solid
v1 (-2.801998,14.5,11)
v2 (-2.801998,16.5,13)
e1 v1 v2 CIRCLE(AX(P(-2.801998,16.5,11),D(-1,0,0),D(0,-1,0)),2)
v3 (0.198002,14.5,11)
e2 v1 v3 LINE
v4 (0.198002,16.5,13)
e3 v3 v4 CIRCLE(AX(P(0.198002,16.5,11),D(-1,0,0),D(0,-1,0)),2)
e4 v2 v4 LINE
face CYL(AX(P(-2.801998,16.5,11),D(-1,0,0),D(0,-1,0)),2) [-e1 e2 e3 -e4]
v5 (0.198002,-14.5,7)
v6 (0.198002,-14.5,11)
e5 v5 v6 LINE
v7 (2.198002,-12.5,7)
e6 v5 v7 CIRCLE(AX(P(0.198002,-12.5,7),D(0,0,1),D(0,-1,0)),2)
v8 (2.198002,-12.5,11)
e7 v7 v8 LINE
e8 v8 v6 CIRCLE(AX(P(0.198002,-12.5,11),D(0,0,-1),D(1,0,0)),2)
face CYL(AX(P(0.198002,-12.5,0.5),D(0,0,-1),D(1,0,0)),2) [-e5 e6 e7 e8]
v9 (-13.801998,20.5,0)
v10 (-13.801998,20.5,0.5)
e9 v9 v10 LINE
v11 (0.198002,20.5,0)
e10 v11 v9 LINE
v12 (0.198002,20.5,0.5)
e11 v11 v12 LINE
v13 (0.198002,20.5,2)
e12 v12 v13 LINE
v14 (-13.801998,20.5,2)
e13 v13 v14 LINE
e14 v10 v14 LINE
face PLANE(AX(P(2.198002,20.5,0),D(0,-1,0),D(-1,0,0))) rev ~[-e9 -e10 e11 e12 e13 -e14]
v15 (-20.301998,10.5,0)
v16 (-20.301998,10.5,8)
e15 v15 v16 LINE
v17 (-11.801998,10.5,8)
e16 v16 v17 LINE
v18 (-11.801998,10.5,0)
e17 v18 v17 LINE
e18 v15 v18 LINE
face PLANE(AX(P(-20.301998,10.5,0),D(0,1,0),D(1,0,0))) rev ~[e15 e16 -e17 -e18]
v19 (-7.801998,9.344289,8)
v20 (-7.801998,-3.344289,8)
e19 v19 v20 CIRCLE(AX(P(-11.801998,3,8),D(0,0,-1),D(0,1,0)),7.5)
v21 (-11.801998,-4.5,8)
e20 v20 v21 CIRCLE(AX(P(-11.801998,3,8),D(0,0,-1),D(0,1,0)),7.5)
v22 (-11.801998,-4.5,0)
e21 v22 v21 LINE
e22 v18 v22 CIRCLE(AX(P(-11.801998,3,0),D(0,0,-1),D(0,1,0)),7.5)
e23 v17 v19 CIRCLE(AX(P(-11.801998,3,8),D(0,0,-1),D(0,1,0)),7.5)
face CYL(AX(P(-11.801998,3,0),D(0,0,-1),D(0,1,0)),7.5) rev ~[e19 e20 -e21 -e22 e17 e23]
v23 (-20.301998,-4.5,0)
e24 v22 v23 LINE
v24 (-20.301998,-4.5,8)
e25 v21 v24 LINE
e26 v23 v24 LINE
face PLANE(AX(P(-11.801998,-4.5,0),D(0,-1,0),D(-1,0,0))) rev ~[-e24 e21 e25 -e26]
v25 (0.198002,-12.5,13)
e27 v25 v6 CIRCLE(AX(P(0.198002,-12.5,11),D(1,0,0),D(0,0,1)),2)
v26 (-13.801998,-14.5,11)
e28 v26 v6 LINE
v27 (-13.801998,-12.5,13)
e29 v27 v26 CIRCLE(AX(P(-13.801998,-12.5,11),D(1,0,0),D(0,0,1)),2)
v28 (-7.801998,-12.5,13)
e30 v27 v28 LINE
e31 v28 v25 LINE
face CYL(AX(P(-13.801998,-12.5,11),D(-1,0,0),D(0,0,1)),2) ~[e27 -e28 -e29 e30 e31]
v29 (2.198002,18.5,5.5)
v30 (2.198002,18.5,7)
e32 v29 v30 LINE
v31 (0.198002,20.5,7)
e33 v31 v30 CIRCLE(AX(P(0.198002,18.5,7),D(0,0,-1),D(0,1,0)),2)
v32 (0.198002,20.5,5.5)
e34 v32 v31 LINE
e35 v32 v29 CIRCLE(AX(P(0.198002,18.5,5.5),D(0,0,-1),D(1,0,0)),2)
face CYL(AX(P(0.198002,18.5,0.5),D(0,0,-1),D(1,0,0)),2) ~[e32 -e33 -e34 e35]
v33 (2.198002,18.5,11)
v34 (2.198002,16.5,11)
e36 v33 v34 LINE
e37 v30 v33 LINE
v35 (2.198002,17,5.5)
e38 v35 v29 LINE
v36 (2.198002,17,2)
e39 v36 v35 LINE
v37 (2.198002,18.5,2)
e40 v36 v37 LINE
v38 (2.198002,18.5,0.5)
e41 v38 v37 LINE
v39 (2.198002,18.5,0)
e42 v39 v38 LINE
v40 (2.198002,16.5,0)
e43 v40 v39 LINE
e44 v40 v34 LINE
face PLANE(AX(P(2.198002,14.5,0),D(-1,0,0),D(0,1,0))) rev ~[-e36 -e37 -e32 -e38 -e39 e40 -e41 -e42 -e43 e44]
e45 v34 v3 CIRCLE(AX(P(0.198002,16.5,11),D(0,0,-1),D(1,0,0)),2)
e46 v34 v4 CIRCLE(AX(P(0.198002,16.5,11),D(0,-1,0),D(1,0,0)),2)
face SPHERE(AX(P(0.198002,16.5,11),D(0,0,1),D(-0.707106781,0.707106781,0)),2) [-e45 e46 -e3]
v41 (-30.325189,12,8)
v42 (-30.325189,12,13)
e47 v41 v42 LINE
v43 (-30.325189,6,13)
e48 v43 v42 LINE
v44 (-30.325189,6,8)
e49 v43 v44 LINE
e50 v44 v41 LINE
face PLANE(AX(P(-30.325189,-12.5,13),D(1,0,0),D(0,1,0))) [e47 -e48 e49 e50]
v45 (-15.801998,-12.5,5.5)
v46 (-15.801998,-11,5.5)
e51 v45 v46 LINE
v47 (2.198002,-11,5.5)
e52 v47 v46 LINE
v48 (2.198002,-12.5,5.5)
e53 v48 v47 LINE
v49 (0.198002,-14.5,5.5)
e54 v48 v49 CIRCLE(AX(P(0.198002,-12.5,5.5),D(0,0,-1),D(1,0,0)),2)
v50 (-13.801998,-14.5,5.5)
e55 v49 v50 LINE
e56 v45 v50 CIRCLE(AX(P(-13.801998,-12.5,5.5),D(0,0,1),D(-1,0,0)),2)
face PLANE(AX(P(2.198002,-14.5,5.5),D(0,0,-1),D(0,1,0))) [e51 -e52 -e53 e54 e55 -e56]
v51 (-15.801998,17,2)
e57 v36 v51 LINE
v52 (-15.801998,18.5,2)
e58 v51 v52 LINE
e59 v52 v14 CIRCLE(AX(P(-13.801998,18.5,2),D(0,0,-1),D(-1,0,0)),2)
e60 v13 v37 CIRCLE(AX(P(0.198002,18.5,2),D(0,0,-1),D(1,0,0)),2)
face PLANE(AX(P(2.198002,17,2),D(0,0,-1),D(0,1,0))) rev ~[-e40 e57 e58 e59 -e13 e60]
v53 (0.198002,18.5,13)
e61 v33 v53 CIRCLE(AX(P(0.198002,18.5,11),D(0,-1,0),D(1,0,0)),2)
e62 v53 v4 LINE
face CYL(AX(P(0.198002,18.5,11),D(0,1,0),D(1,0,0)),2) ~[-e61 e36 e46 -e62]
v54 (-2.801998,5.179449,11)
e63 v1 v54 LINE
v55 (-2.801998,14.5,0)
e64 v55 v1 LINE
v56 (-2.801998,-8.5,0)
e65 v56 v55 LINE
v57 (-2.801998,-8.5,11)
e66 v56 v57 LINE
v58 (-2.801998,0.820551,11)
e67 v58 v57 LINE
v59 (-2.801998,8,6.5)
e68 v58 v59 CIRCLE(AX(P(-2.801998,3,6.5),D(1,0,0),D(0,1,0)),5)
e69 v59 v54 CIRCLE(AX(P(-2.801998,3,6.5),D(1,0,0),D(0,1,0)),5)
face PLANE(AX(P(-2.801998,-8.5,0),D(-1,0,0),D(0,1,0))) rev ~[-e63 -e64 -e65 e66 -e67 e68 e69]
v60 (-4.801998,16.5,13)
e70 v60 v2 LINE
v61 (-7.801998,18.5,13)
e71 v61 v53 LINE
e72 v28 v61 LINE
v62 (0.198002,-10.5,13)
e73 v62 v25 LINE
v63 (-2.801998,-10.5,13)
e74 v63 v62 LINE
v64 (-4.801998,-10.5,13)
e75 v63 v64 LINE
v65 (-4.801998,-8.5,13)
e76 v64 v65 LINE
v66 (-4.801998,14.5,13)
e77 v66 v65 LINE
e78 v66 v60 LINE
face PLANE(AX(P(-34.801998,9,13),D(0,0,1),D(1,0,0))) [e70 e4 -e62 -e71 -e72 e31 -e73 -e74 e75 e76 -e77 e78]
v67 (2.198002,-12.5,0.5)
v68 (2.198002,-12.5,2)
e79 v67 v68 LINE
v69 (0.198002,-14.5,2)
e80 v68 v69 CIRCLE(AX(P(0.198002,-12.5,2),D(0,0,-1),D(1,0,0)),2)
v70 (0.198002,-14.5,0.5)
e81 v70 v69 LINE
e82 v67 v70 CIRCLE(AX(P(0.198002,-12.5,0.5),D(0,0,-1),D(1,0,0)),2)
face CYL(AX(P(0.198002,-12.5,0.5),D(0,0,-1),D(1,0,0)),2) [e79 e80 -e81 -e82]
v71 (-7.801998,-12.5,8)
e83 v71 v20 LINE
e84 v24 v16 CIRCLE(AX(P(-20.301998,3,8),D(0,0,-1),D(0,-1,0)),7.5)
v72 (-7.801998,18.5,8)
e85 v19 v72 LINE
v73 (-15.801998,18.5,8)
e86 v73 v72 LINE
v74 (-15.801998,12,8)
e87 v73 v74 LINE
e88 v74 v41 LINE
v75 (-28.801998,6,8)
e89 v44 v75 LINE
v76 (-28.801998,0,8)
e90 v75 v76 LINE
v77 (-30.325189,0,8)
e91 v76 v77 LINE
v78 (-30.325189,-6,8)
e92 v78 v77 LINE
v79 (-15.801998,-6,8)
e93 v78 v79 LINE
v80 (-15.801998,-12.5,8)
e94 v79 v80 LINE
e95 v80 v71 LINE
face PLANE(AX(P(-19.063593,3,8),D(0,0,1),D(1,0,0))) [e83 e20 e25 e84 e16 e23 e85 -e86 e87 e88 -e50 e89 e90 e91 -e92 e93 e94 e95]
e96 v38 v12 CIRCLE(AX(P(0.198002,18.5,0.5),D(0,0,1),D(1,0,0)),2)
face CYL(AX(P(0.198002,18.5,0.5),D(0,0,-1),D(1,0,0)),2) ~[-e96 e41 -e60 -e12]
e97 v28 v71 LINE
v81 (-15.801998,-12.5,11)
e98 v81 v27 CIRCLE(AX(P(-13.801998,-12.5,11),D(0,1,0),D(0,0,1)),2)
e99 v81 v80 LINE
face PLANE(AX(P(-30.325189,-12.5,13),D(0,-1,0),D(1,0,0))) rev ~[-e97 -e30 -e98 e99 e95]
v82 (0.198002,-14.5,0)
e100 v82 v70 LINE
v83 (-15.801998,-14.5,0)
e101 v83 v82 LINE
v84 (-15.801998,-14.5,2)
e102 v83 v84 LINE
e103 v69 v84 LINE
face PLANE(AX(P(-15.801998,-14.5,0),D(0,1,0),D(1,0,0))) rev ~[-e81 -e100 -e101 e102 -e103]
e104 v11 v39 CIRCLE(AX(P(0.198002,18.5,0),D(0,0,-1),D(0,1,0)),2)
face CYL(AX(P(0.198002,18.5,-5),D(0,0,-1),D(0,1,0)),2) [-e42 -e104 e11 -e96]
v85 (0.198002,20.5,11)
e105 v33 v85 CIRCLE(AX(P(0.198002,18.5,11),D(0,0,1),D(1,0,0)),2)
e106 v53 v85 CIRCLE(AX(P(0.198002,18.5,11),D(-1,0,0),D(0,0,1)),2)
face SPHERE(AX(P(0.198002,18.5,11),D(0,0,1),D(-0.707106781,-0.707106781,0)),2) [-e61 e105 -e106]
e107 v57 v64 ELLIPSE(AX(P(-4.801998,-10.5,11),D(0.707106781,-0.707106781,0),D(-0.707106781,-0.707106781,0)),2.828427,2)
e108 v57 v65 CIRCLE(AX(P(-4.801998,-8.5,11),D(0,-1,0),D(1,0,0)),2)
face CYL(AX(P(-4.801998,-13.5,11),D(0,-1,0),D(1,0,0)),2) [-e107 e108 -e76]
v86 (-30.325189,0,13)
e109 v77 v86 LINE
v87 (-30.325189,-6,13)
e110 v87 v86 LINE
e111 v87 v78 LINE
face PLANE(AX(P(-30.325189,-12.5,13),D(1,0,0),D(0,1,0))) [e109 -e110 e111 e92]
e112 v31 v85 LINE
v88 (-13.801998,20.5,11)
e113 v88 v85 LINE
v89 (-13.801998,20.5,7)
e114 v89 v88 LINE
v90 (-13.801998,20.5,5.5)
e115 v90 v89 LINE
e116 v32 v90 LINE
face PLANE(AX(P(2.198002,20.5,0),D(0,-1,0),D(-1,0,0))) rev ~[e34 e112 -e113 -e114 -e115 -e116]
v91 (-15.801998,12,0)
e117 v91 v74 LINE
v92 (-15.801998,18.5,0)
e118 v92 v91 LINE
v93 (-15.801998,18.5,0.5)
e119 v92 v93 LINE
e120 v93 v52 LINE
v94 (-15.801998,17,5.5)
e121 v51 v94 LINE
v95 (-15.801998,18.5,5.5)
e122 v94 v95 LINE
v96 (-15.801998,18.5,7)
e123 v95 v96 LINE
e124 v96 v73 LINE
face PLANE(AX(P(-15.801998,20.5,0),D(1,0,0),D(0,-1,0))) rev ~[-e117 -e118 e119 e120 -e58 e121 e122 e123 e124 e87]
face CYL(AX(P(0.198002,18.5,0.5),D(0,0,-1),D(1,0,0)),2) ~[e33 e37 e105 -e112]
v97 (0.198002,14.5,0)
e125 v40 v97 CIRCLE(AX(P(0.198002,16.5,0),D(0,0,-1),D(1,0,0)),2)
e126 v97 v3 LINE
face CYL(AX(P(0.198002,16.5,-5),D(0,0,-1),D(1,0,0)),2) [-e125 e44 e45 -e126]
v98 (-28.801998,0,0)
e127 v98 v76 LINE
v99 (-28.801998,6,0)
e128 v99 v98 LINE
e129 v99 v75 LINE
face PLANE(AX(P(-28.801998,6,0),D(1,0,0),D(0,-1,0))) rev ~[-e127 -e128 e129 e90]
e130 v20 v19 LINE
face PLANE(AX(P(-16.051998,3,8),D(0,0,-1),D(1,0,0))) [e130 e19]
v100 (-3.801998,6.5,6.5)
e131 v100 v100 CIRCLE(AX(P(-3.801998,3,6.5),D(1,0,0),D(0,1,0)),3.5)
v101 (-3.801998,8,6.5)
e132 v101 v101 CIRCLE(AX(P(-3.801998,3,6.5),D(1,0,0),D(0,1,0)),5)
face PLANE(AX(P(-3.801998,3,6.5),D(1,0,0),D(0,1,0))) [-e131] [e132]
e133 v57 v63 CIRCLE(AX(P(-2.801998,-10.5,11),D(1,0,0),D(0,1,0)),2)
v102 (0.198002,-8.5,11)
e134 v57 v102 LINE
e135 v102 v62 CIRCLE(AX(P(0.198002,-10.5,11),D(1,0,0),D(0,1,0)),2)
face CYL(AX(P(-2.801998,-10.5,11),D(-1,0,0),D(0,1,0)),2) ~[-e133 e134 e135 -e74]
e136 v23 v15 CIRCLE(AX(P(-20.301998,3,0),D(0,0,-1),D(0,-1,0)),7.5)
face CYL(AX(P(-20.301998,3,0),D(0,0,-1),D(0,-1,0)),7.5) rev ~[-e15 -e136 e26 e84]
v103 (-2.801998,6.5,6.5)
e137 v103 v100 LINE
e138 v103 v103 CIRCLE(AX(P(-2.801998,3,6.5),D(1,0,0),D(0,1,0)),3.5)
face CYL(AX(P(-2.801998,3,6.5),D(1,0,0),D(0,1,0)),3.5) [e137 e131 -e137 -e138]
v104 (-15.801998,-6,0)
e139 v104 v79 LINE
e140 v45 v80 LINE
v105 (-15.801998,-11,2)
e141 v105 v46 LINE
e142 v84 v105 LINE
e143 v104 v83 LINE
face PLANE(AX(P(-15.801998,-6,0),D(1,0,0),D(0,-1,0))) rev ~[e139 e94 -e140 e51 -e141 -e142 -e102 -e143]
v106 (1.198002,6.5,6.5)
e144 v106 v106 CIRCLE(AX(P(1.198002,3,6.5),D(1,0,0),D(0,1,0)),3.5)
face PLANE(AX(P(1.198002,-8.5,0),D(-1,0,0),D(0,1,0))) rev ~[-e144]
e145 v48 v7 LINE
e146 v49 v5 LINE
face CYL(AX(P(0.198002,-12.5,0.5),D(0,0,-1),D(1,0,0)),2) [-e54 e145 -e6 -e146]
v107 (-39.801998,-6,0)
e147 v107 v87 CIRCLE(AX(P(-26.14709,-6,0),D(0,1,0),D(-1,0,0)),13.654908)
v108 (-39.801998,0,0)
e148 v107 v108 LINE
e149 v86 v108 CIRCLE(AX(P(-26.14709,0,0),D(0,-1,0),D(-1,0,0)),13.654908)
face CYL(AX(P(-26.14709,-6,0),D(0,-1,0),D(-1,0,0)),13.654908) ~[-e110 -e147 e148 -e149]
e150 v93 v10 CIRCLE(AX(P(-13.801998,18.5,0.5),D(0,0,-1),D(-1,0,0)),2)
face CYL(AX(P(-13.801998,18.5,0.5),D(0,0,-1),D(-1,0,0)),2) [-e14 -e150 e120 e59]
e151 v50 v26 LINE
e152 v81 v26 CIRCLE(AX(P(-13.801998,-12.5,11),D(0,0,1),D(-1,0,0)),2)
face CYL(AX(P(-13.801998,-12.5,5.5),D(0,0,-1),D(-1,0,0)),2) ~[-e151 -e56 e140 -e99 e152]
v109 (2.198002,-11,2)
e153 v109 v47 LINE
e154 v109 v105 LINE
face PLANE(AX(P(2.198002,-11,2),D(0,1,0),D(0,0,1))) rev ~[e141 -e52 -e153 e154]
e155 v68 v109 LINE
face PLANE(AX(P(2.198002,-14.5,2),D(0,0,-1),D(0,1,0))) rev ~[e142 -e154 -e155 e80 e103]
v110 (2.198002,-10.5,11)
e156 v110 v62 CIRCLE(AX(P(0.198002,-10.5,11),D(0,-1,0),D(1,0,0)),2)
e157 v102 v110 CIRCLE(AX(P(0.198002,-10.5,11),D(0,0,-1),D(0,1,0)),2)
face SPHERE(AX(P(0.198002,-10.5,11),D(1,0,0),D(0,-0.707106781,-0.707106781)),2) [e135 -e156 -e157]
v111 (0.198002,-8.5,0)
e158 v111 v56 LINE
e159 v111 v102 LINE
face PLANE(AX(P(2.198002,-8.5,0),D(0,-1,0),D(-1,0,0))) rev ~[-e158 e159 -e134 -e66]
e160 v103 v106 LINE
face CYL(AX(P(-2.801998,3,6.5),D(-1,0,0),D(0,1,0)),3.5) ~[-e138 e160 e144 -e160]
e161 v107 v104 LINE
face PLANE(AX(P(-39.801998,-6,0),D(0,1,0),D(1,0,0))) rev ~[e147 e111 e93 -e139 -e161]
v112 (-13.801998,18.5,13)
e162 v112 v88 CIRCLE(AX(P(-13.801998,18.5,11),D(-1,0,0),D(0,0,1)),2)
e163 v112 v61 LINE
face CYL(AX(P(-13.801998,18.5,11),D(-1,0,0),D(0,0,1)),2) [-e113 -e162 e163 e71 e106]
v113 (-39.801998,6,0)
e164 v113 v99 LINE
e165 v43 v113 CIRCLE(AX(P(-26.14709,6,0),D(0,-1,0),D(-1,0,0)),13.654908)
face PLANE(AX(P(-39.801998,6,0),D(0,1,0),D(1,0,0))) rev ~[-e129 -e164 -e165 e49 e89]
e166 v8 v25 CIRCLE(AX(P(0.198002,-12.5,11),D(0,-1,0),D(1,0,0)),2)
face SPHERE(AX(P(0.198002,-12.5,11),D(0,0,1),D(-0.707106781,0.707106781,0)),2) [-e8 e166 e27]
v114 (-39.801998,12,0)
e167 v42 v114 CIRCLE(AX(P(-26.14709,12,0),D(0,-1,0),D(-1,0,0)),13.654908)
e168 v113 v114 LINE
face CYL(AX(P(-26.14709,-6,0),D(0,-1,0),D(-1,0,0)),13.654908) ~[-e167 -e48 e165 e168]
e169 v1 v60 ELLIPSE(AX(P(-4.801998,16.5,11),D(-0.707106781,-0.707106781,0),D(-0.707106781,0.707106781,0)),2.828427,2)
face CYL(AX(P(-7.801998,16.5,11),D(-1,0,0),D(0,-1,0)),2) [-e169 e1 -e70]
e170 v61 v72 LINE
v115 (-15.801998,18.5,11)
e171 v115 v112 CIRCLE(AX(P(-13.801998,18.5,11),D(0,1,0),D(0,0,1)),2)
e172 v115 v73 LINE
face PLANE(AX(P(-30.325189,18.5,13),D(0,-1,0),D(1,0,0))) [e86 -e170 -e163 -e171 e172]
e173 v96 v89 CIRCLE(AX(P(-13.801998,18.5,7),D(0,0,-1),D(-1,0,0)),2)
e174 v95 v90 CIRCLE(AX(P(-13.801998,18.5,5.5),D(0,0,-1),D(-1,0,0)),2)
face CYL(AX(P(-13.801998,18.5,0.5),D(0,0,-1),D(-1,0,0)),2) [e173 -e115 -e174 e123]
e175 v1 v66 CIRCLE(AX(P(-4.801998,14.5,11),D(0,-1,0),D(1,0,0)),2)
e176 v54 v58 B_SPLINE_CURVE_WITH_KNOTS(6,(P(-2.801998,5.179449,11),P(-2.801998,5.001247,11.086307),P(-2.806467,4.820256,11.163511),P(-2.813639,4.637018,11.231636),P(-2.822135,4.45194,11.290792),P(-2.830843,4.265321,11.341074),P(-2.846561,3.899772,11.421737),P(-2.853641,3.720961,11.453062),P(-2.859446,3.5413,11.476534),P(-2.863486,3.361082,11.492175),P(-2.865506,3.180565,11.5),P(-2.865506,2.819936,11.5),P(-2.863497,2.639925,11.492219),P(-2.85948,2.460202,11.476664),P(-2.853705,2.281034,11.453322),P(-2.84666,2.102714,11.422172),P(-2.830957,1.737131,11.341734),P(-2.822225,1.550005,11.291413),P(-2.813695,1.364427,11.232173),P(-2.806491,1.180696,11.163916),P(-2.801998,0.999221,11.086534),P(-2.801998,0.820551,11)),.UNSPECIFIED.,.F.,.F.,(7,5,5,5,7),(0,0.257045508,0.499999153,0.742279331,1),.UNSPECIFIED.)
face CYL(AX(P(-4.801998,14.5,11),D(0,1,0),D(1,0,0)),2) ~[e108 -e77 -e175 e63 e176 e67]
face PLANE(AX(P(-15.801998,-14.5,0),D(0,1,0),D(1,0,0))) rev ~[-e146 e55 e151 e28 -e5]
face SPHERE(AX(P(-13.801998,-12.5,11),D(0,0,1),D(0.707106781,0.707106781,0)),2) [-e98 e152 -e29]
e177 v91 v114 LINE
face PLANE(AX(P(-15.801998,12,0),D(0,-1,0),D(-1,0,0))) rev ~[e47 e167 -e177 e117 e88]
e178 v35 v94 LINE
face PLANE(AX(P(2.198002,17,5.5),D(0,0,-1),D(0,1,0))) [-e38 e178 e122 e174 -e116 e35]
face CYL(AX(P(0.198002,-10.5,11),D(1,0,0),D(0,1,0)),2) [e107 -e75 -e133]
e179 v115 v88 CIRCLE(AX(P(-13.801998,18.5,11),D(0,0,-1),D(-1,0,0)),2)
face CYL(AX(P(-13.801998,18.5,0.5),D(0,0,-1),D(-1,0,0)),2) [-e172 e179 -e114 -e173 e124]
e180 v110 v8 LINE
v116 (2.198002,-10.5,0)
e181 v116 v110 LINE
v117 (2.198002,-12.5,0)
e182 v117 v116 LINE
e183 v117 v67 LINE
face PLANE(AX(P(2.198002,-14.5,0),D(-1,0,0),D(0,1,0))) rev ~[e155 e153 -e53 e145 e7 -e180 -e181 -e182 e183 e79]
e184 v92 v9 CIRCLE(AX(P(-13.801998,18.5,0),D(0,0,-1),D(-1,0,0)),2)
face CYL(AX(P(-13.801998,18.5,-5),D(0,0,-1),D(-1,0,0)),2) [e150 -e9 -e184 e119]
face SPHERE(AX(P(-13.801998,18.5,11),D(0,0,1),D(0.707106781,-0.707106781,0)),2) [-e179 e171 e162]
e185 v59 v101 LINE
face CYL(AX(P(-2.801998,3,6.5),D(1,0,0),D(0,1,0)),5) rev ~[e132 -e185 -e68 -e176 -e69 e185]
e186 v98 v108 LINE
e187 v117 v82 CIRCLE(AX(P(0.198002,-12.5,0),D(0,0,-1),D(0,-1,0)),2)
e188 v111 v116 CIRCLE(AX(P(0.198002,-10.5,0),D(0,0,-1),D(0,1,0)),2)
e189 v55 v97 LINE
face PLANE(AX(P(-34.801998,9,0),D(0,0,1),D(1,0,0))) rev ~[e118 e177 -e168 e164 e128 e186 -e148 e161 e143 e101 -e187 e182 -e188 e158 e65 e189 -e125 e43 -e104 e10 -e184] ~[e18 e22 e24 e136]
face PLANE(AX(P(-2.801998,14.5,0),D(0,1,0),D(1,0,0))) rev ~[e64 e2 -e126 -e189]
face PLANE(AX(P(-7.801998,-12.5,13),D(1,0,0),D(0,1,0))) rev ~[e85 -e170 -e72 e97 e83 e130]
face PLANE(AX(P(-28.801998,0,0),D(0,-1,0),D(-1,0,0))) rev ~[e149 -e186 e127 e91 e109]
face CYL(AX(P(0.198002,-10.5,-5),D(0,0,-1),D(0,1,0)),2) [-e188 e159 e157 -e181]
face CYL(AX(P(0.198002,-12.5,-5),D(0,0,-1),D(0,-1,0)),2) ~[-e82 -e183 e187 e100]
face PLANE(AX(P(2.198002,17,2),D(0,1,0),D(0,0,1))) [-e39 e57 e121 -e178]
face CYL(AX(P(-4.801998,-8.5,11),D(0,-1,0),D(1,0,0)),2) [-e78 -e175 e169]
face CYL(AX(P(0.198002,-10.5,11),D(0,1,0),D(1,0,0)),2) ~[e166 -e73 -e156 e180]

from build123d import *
from build123d import SkipClean  # not in build123d's __all__

# Parameters (mm, degrees)
F0_W          = 10
F0_H          = 6
F1_DEPTH      = 13
F3_DEPTH      = 25
F4_W          = 22.5231910496
F4_H          = 31
F5_DEPTH      = 5
F7_DEPTH      = 8
F8_R          = 5
F8_R_2        = 3.5
F9_DEPTH      = 1
F10_DEPTH     = 4
F11_W         = 3.5
F11_H         = 3.5
F12_DEPTH     = 42.001
F13_W         = 3.5
F13_H         = 3.5
F14_DEPTH     = 42.001
F15_T1_DEPTH  = 14
F15_T3_DEPTH  = 2
F15_T5_DEPTH  = 3
F15_T7_DEPTH  = 23
F15_T9_DEPTH  = 2
F15_T11_DEPTH = 10.5
F15_T13_DEPTH = 12
F15_T15_DEPTH = 16
F15_T17_DEPTH = 5.5
F15_S21_W     = 2.04
F15_S21_H     = 2.04
F15_T22_DEPTH = 2.04
F15_S27_W     = 2.04
F15_S27_H     = 2.04
F15_T28_DEPTH = 2.04
F15_S33_W     = 2.04
F15_S33_H     = 2.04
F15_T34_DEPTH = 2.04
F15_S39_W     = 2.04
F15_S39_H     = 2.04
F15_T40_DEPTH = 2.04
F15_S45_W     = 2.04
F15_S45_H     = 2.04
F15_T46_DEPTH = 2.04
F15_S51_W     = 2.04
F15_S51_H     = 2.04
F15_T52_DEPTH = 2.04
F15_T59_DEPTH = 28
F15_T63_DEPTH = 8
F15_T70_DEPTH = 8
F15_T74_DEPTH = 28


# Not quite as in the source:
# - a fillet or chamfer that OpenCascade refuses, or shapes differently, is made with other operations: its cross-section is extruded or revolved along the edge and cut away or added


with BuildPart() as f1:
    # F0 (on Top) → F1 (new body)
    with BuildSketch(Plane.XY):
        with Locations((-34.8019978553, 9)):
            Rectangle(F0_W, F0_H)
        with Locations((-34.8019978553, -3)):
            Rectangle(F0_W, F0_H)
        Polygon((2.1980021447, 20.5), (-15.8019978553, 20.5), (-15.8019978553, 12), (-29.8019978553, 12), (-29.8019978553, 6), (-28.8019978553, 6), (-28.8019978553, 0), (-29.8019978553, 0), (-29.8019978553, -6), (-15.8019978553, -6), (-15.8019978553, -14.5), (2.1980021447, -14.5), (2.1980021447, -8.5), (-2.8019978553, -8.5), (-2.8019978553, 14.5), (2.1980021447, 14.5), align=None)
    extrude(amount=F1_DEPTH)

    # F2 (on face) → F3 (cut)
    with BuildSketch(Plane.XZ.offset(6)):
        with BuildLine():
            Line((-39.8019978553, 13), (-39.8019978553, 0))
            ThreePointArc((-39.8019978553, 0), (-37.1813109556, 8.0437849903), (-30.3251889049, 13))
            Line((-30.3251889049, 13), (-39.8019978553, 13))
        make_face()
    extrude(amount=-F3_DEPTH, mode=Mode.SUBTRACT)

    # F4 (on face) → F5 (cut)
    with BuildSketch(Plane.XY.offset(13)):
        with Locations((-19.0635933801, 3)):
            Rectangle(F4_W, F4_H)
    extrude(amount=-F5_DEPTH, mode=Mode.SUBTRACT)

    # F6 (on face) → F7 (cut, through all)
    with BuildSketch(Plane(origin=(0, 0, 0), x_dir=(1, 0, 0), z_dir=(0, 0, -1))):
        with BuildLine():
            Line((-11.8019978553, 4.5), (-20.3019978553, 4.5))
            ThreePointArc((-20.3019978553, 4.5), (-27.8019978553, -3), (-20.3019978553, -10.5))
            Line((-20.3019978553, -10.5), (-11.8019978553, -10.5))
            ThreePointArc((-11.8019978553, -10.5), (-4.3019978553, -3), (-11.8019978553, 4.5))
        make_face()
    extrude(amount=-F7_DEPTH, mode=Mode.SUBTRACT)

    # F8 (on face) → F9 (cut)
    with BuildSketch(Plane.YZ.offset(-2.8019978553)):
        with Locations((3, 6.5)):
            Circle(F8_R)
        with Locations((3, 6.5)):
            Circle(F8_R_2, mode=Mode.SUBTRACT)
    extrude(amount=-F9_DEPTH, mode=Mode.SUBTRACT)

    # F10 (add): a face of the model
    f10_faces = [f1.faces().sort_by_distance(p)[0] for p in [
        (-2.8019978553, 3, 6.5),
    ]]
    extrude(f10_faces, amount=F10_DEPTH)

    # F11 (on face) → F12 (cut, through all)
    with BuildSketch(Plane.YZ.offset(2.1980021447)):
        with Locations((-12.75, 3.75)):
            Rectangle(F11_W, F11_H)
    extrude(amount=-F12_DEPTH, mode=Mode.SUBTRACT)

    # F13 (on face) → F14 (cut, through all)
    with BuildSketch(Plane.YZ.offset(2.1980021447)):
        with Locations((18.75, 3.75)):
            Rectangle(F13_W, F13_H)
    extrude(amount=-F14_DEPTH, mode=Mode.SUBTRACT)

    # F15: fillet of radius 2 on 18 edges, made by hand

    # F15_s2 → F15_t1 (cut)
    with BuildSketch(Plane.YZ.offset(-13.8019978553)):
        with BuildLine():
            ThreePointArc((-12.5, 13), (-13.9142135624, 12.4142135624), (-14.5, 11))
            Line((-14.5, 11), (-14.5, 13))
            Line((-14.5, 13), (-12.5, 13))
        make_face()
        with BuildLine():
            ThreePointArc((18.5, 13), (19.9142135624, 12.4142135624), (20.5, 11))
            Line((20.5, 11), (20.5, 13))
            Line((20.5, 13), (18.5, 13))
        make_face()
    extrude(amount=F15_T1_DEPTH, mode=Mode.SUBTRACT)

    # F15_s4 → F15_t3 (cut)
    with BuildSketch(Plane.XZ.offset(10.5)):
        with BuildLine():
            ThreePointArc((2.1980021447, 11), (1.6122157071, 12.4142135624), (0.1980021447, 13))
            Line((0.1980021447, 13), (2.1980021447, 13))
            Line((2.1980021447, 13), (2.1980021447, 11))
        make_face()
    extrude(amount=F15_T3_DEPTH, mode=Mode.SUBTRACT)

    # F15_s6 → F15_t5 (cut)
    with BuildSketch(Plane.YZ.offset(-2.8019978553)):
        with BuildLine():
            ThreePointArc((-8.5, 11), (-9.0857864376, 12.4142135624), (-10.5, 13))
            Line((-10.5, 13), (-8.5, 13))
            Line((-8.5, 13), (-8.5, 11))
        make_face()
        with BuildLine():
            ThreePointArc((14.5, 11), (15.0857864376, 12.4142135624), (16.5, 13))
            Line((16.5, 13), (14.5, 13))
            Line((14.5, 13), (14.5, 11))
        make_face()
    extrude(amount=F15_T5_DEPTH, mode=Mode.SUBTRACT)

    # F15_s8 → F15_t7 (cut)
    with BuildSketch(Plane.XZ.offset(-14.5)):
        with BuildLine():
            ThreePointArc((-2.8019978553, 11), (-3.3877842929, 12.4142135624), (-4.8019978553, 13))
            Line((-4.8019978553, 13), (-2.8019978553, 13))
            Line((-2.8019978553, 13), (-2.8019978553, 11))
        make_face()
    extrude(amount=F15_T7_DEPTH, mode=Mode.SUBTRACT)

    # F15_s10 → F15_t9 (cut)
    with BuildSketch(Plane.XZ.offset(-18.5)):
        with BuildLine():
            ThreePointArc((2.1980021447, 11), (1.6122157071, 12.4142135624), (0.1980021447, 13))
            Line((0.1980021447, 13), (2.1980021447, 13))
            Line((2.1980021447, 13), (2.1980021447, 11))
        make_face()
    extrude(amount=F15_T9_DEPTH, mode=Mode.SUBTRACT)

    # F15_s12 → F15_t11 (cut)
    with BuildSketch(Plane.XY.offset(0.5)):
        with BuildLine():
            ThreePointArc((2.1980021447, 18.5), (1.6122157071, 19.9142135624), (0.1980021447, 20.5))
            Line((0.1980021447, 20.5), (2.1980021447, 20.5))
            Line((2.1980021447, 20.5), (2.1980021447, 18.5))
        make_face()
        with BuildLine():
            ThreePointArc((-15.8019978553, 18.5), (-15.2162114177, 19.9142135624), (-13.8019978553, 20.5))
            Line((-13.8019978553, 20.5), (-15.8019978553, 20.5))
            Line((-15.8019978553, 20.5), (-15.8019978553, 18.5))
        make_face()
        with BuildLine():
            ThreePointArc((2.1980021447, -12.5), (1.6122157071, -13.9142135624), (0.1980021447, -14.5))
            Line((0.1980021447, -14.5), (2.1980021447, -14.5))
            Line((2.1980021447, -14.5), (2.1980021447, -12.5))
        make_face()
    extrude(amount=F15_T11_DEPTH, mode=Mode.SUBTRACT)

    # F15_s14 → F15_t13 (cut)
    with BuildSketch(Plane.XY.offset(-5)):
        with BuildLine():
            ThreePointArc((-15.8019978553, 18.5), (-15.2162114177, 19.9142135624), (-13.8019978553, 20.5))
            Line((-13.8019978553, 20.5), (-15.8019978553, 20.5))
            Line((-15.8019978553, 20.5), (-15.8019978553, 18.5))
        make_face()
        with BuildLine():
            ThreePointArc((0.1980021447, -14.5), (1.6122157071, -13.9142135624), (2.1980021447, -12.5))
            Line((2.1980021447, -12.5), (2.1980021447, -14.5))
            Line((2.1980021447, -14.5), (0.1980021447, -14.5))
        make_face()
        with BuildLine():
            ThreePointArc((0.1980021447, 20.5), (1.6122157071, 19.9142135624), (2.1980021447, 18.5))
            Line((2.1980021447, 18.5), (2.1980021447, 20.5))
            Line((2.1980021447, 20.5), (0.1980021447, 20.5))
        make_face()
    with SkipClean():  # cleaning this boolean's faces spoils the solid; the shape is the same uncleaned
        extrude(amount=F15_T13_DEPTH, mode=Mode.SUBTRACT)

    # F15_s16 → F15_t15 (cut)
    with BuildSketch(Plane.XY.offset(-5)):
        with BuildLine():
            ThreePointArc((0.1980021447, -8.5), (1.6122157071, -9.0857864376), (2.1980021447, -10.5))
            Line((2.1980021447, -10.5), (2.1980021447, -8.5))
            Line((2.1980021447, -8.5), (0.1980021447, -8.5))
        make_face()
        with BuildLine():
            ThreePointArc((2.1980021447, 16.5), (1.6122157071, 15.0857864376), (0.1980021447, 14.5))
            Line((0.1980021447, 14.5), (2.1980021447, 14.5))
            Line((2.1980021447, 14.5), (2.1980021447, 16.5))
        make_face()
    extrude(amount=F15_T15_DEPTH, mode=Mode.SUBTRACT)

    # F15_s18 → F15_t17 (cut)
    with BuildSketch(Plane.XY.offset(5.5)):
        with BuildLine():
            ThreePointArc((-15.8019978553, -12.5), (-15.2162114177, -13.9142135624), (-13.8019978553, -14.5))
            Line((-13.8019978553, -14.5), (-15.8019978553, -14.5))
            Line((-15.8019978553, -14.5), (-15.8019978553, -12.5))
        make_face()
    extrude(amount=F15_T17_DEPTH, mode=Mode.SUBTRACT)


with BuildPart() as f15_tool20:
    # F15_s21 → F15_t22 (new body)
    with BuildSketch(Plane.XY.offset(11)):
        with Locations((-14.8219978553, -13.52)):
            Rectangle(F15_S21_W, F15_S21_H)
    extrude(amount=F15_T22_DEPTH)

    # F15_s23 → F15_t24 (revolve, cut)
    with BuildSketch(Plane(origin=(-13.8019978553, -12.5, 11), x_dir=(0.7071067812, 0.7071067812, 0), z_dir=(0.7071067812, -0.7071067812, 0))):
        with BuildLine():
            ThreePointArc((0, -2), (2, 0), (0, 2))
            Line((0, 2), (0, -2))
        make_face()
    revolve(axis=Axis((-13.8019978553, -12.5, 11), (0, 0, 1)), mode=Mode.SUBTRACT)


with BuildPart() as f1_1:
    add(f1.part, clean=False)

    # F15_t19: cut F15_tool20
    add(f15_tool20.part, mode=Mode.SUBTRACT)


with BuildPart() as f15_tool26:
    # F15_s27 → F15_t28 (new body)
    with BuildSketch(Plane.XY.offset(11)):
        with Locations((1.2180021447, -13.52)):
            Rectangle(F15_S27_W, F15_S27_H)
    extrude(amount=F15_T28_DEPTH)

    # F15_s29 → F15_t30 (revolve, cut)
    with BuildSketch(Plane(origin=(0.1980021447, -12.5, 11), x_dir=(-0.7071067812, 0.7071067812, 0), z_dir=(0.7071067812, 0.7071067812, 0))):
        with BuildLine():
            ThreePointArc((0, -2), (2, 0), (0, 2))
            Line((0, 2), (0, -2))
        make_face()
    revolve(axis=Axis((0.1980021447, -12.5, 11), (0, 0, 1)), mode=Mode.SUBTRACT)


with BuildPart() as f1_2:
    add(f1_1.part, clean=False)

    # F15_t25: cut F15_tool26
    add(f15_tool26.part, mode=Mode.SUBTRACT)


with BuildPart() as f15_tool32:
    # F15_s33 → F15_t34 (new body)
    with BuildSketch(Plane.YZ.offset(0.1980021447)):
        with Locations((-9.48, 12.02)):
            Rectangle(F15_S33_W, F15_S33_H)
    extrude(amount=F15_T34_DEPTH)

    # F15_s35 → F15_t36 (revolve, cut)
    with BuildSketch(Plane(origin=(0.1980021447, -10.5, 11), x_dir=(0, -0.7071067812, -0.7071067812), z_dir=(0, -0.7071067812, 0.7071067812))):
        with BuildLine():
            ThreePointArc((0, -2), (2, 0), (0, 2))
            Line((0, 2), (0, -2))
        make_face()
    revolve(axis=Axis((0.1980021447, -10.5, 11), (1, 0, 0)), mode=Mode.SUBTRACT)


with BuildPart() as f1_3:
    add(f1_2.part, clean=False)

    # F15_t31: cut F15_tool32
    add(f15_tool32.part, mode=Mode.SUBTRACT)


with BuildPart() as f15_tool38:
    # F15_s39 → F15_t40 (new body)
    with BuildSketch(Plane.XY.offset(11)):
        with Locations((1.2180021447, 15.48)):
            Rectangle(F15_S39_W, F15_S39_H)
    extrude(amount=F15_T40_DEPTH)

    # F15_s41 → F15_t42 (revolve, cut)
    with BuildSketch(Plane(origin=(0.1980021447, 16.5, 11), x_dir=(-0.7071067812, 0.7071067812, 0), z_dir=(0.7071067812, 0.7071067812, 0))):
        with BuildLine():
            ThreePointArc((0, -2), (2, 0), (0, 2))
            Line((0, 2), (0, -2))
        make_face()
    revolve(axis=Axis((0.1980021447, 16.5, 11), (0, 0, 1)), mode=Mode.SUBTRACT)


with BuildPart() as f1_4:
    add(f1_3.part, clean=False)

    # F15_t37: cut F15_tool38
    add(f15_tool38.part, mode=Mode.SUBTRACT)


with BuildPart() as f15_tool44:
    # F15_s45 → F15_t46 (new body)
    with BuildSketch(Plane.XY.offset(11)):
        with Locations((1.2180021447, 19.52)):
            Rectangle(F15_S45_W, F15_S45_H)
    extrude(amount=F15_T46_DEPTH)

    # F15_s47 → F15_t48 (revolve, cut)
    with BuildSketch(Plane(origin=(0.1980021447, 18.5, 11), x_dir=(-0.7071067812, -0.7071067812, 0), z_dir=(-0.7071067812, 0.7071067812, 0))):
        with BuildLine():
            ThreePointArc((0, -2), (2, 0), (0, 2))
            Line((0, 2), (0, -2))
        make_face()
    revolve(axis=Axis((0.1980021447, 18.5, 11), (0, 0, 1)), mode=Mode.SUBTRACT)


with BuildPart() as f1_5:
    add(f1_4.part, clean=False)

    # F15_t43: cut F15_tool44
    add(f15_tool44.part, mode=Mode.SUBTRACT)


with BuildPart() as f15_tool50:
    # F15_s51 → F15_t52 (new body)
    with BuildSketch(Plane.XY.offset(11)):
        with Locations((-14.8219978553, 19.52)):
            Rectangle(F15_S51_W, F15_S51_H)
    extrude(amount=F15_T52_DEPTH)

    # F15_s53 → F15_t54 (revolve, cut)
    with BuildSketch(Plane(origin=(-13.8019978553, 18.5, 11), x_dir=(0.7071067812, -0.7071067812, 0), z_dir=(-0.7071067812, -0.7071067812, 0))):
        with BuildLine():
            ThreePointArc((0, -2), (2, 0), (0, 2))
            Line((0, 2), (0, -2))
        make_face()
    revolve(axis=Axis((-13.8019978553, 18.5, 11), (0, 0, 1)), mode=Mode.SUBTRACT)


with BuildPart() as f1_6:
    add(f1_5.part, clean=False)

    # F15_t49: cut F15_tool50
    add(f15_tool50.part, mode=Mode.SUBTRACT)


with BuildPart() as f15_tool57:
    # F15_s58 → F15_t59 (new body)
    with BuildSketch(Plane.XZ.offset(13.5)):
        with BuildLine():
            ThreePointArc((-2.8019978553, 11), (-3.3877842929, 12.4142135624), (-4.8019978553, 13))
            Line((-4.8019978553, 13), (-2.8019978553, 13))
            Line((-2.8019978553, 13), (-2.8019978553, 11))
        make_face()
    extrude(amount=-F15_T59_DEPTH)

    split(bisect_by=Plane.XZ.offset(8.5), keep=Keep.TOP)


with BuildPart() as f15_tool61:
    # F15_s62 → F15_t63 (new body)
    with BuildSketch(Plane.YZ.offset(0.1980021447)):
        with BuildLine():
            ThreePointArc((-8.5, 11), (-9.0857864376, 12.4142135624), (-10.5, 13))
            Line((-10.5, 13), (-8.5, 13))
            Line((-8.5, 13), (-8.5, 11))
        make_face()
    extrude(amount=-F15_T63_DEPTH)

    split(bisect_by=Plane.YZ.offset(-2.8019978553), keep=Keep.BOTTOM)


with BuildPart() as f15_tool57_1:
    add(f15_tool57.part, clean=False)

    # F15_t65: intersect F15_tool61
    add(f15_tool61.part, mode=Mode.INTERSECT)


with BuildPart() as f1_7:
    add(f1_6.part, clean=False)

    # F15_t55: cut F15_tool57
    add(f15_tool57_1.part, mode=Mode.SUBTRACT)


with BuildPart() as f15_tool68:
    # F15_s69 → F15_t70 (new body)
    with BuildSketch(Plane.YZ.offset(-7.8019978553)):
        with BuildLine():
            ThreePointArc((14.5, 11), (15.0857864376, 12.4142135624), (16.5, 13))
            Line((16.5, 13), (14.5, 13))
            Line((14.5, 13), (14.5, 11))
        make_face()
    extrude(amount=F15_T70_DEPTH)

    split(bisect_by=Plane.YZ.offset(-2.8019978553), keep=Keep.BOTTOM)


with BuildPart() as f15_tool72:
    # F15_s73 → F15_t74 (new body)
    with BuildSketch(Plane.XZ.offset(8.5)):
        with BuildLine():
            ThreePointArc((-2.8019978553, 11), (-3.3877842929, 12.4142135624), (-4.8019978553, 13))
            Line((-4.8019978553, 13), (-2.8019978553, 13))
            Line((-2.8019978553, 13), (-2.8019978553, 11))
        make_face()
    extrude(amount=-F15_T74_DEPTH)

    split(bisect_by=Plane.XZ.offset(-14.5), keep=Keep.BOTTOM)


with BuildPart() as f15_tool68_1:
    add(f15_tool68.part, clean=False)

    # F15_t76: intersect F15_tool72
    add(f15_tool72.part, mode=Mode.INTERSECT)


with BuildPart() as f1_8:
    add(f1_7.part, clean=False)

    # F15_t66: cut F15_tool68
    add(f15_tool68_1.part, mode=Mode.SUBTRACT)


solid = f1_8.part
